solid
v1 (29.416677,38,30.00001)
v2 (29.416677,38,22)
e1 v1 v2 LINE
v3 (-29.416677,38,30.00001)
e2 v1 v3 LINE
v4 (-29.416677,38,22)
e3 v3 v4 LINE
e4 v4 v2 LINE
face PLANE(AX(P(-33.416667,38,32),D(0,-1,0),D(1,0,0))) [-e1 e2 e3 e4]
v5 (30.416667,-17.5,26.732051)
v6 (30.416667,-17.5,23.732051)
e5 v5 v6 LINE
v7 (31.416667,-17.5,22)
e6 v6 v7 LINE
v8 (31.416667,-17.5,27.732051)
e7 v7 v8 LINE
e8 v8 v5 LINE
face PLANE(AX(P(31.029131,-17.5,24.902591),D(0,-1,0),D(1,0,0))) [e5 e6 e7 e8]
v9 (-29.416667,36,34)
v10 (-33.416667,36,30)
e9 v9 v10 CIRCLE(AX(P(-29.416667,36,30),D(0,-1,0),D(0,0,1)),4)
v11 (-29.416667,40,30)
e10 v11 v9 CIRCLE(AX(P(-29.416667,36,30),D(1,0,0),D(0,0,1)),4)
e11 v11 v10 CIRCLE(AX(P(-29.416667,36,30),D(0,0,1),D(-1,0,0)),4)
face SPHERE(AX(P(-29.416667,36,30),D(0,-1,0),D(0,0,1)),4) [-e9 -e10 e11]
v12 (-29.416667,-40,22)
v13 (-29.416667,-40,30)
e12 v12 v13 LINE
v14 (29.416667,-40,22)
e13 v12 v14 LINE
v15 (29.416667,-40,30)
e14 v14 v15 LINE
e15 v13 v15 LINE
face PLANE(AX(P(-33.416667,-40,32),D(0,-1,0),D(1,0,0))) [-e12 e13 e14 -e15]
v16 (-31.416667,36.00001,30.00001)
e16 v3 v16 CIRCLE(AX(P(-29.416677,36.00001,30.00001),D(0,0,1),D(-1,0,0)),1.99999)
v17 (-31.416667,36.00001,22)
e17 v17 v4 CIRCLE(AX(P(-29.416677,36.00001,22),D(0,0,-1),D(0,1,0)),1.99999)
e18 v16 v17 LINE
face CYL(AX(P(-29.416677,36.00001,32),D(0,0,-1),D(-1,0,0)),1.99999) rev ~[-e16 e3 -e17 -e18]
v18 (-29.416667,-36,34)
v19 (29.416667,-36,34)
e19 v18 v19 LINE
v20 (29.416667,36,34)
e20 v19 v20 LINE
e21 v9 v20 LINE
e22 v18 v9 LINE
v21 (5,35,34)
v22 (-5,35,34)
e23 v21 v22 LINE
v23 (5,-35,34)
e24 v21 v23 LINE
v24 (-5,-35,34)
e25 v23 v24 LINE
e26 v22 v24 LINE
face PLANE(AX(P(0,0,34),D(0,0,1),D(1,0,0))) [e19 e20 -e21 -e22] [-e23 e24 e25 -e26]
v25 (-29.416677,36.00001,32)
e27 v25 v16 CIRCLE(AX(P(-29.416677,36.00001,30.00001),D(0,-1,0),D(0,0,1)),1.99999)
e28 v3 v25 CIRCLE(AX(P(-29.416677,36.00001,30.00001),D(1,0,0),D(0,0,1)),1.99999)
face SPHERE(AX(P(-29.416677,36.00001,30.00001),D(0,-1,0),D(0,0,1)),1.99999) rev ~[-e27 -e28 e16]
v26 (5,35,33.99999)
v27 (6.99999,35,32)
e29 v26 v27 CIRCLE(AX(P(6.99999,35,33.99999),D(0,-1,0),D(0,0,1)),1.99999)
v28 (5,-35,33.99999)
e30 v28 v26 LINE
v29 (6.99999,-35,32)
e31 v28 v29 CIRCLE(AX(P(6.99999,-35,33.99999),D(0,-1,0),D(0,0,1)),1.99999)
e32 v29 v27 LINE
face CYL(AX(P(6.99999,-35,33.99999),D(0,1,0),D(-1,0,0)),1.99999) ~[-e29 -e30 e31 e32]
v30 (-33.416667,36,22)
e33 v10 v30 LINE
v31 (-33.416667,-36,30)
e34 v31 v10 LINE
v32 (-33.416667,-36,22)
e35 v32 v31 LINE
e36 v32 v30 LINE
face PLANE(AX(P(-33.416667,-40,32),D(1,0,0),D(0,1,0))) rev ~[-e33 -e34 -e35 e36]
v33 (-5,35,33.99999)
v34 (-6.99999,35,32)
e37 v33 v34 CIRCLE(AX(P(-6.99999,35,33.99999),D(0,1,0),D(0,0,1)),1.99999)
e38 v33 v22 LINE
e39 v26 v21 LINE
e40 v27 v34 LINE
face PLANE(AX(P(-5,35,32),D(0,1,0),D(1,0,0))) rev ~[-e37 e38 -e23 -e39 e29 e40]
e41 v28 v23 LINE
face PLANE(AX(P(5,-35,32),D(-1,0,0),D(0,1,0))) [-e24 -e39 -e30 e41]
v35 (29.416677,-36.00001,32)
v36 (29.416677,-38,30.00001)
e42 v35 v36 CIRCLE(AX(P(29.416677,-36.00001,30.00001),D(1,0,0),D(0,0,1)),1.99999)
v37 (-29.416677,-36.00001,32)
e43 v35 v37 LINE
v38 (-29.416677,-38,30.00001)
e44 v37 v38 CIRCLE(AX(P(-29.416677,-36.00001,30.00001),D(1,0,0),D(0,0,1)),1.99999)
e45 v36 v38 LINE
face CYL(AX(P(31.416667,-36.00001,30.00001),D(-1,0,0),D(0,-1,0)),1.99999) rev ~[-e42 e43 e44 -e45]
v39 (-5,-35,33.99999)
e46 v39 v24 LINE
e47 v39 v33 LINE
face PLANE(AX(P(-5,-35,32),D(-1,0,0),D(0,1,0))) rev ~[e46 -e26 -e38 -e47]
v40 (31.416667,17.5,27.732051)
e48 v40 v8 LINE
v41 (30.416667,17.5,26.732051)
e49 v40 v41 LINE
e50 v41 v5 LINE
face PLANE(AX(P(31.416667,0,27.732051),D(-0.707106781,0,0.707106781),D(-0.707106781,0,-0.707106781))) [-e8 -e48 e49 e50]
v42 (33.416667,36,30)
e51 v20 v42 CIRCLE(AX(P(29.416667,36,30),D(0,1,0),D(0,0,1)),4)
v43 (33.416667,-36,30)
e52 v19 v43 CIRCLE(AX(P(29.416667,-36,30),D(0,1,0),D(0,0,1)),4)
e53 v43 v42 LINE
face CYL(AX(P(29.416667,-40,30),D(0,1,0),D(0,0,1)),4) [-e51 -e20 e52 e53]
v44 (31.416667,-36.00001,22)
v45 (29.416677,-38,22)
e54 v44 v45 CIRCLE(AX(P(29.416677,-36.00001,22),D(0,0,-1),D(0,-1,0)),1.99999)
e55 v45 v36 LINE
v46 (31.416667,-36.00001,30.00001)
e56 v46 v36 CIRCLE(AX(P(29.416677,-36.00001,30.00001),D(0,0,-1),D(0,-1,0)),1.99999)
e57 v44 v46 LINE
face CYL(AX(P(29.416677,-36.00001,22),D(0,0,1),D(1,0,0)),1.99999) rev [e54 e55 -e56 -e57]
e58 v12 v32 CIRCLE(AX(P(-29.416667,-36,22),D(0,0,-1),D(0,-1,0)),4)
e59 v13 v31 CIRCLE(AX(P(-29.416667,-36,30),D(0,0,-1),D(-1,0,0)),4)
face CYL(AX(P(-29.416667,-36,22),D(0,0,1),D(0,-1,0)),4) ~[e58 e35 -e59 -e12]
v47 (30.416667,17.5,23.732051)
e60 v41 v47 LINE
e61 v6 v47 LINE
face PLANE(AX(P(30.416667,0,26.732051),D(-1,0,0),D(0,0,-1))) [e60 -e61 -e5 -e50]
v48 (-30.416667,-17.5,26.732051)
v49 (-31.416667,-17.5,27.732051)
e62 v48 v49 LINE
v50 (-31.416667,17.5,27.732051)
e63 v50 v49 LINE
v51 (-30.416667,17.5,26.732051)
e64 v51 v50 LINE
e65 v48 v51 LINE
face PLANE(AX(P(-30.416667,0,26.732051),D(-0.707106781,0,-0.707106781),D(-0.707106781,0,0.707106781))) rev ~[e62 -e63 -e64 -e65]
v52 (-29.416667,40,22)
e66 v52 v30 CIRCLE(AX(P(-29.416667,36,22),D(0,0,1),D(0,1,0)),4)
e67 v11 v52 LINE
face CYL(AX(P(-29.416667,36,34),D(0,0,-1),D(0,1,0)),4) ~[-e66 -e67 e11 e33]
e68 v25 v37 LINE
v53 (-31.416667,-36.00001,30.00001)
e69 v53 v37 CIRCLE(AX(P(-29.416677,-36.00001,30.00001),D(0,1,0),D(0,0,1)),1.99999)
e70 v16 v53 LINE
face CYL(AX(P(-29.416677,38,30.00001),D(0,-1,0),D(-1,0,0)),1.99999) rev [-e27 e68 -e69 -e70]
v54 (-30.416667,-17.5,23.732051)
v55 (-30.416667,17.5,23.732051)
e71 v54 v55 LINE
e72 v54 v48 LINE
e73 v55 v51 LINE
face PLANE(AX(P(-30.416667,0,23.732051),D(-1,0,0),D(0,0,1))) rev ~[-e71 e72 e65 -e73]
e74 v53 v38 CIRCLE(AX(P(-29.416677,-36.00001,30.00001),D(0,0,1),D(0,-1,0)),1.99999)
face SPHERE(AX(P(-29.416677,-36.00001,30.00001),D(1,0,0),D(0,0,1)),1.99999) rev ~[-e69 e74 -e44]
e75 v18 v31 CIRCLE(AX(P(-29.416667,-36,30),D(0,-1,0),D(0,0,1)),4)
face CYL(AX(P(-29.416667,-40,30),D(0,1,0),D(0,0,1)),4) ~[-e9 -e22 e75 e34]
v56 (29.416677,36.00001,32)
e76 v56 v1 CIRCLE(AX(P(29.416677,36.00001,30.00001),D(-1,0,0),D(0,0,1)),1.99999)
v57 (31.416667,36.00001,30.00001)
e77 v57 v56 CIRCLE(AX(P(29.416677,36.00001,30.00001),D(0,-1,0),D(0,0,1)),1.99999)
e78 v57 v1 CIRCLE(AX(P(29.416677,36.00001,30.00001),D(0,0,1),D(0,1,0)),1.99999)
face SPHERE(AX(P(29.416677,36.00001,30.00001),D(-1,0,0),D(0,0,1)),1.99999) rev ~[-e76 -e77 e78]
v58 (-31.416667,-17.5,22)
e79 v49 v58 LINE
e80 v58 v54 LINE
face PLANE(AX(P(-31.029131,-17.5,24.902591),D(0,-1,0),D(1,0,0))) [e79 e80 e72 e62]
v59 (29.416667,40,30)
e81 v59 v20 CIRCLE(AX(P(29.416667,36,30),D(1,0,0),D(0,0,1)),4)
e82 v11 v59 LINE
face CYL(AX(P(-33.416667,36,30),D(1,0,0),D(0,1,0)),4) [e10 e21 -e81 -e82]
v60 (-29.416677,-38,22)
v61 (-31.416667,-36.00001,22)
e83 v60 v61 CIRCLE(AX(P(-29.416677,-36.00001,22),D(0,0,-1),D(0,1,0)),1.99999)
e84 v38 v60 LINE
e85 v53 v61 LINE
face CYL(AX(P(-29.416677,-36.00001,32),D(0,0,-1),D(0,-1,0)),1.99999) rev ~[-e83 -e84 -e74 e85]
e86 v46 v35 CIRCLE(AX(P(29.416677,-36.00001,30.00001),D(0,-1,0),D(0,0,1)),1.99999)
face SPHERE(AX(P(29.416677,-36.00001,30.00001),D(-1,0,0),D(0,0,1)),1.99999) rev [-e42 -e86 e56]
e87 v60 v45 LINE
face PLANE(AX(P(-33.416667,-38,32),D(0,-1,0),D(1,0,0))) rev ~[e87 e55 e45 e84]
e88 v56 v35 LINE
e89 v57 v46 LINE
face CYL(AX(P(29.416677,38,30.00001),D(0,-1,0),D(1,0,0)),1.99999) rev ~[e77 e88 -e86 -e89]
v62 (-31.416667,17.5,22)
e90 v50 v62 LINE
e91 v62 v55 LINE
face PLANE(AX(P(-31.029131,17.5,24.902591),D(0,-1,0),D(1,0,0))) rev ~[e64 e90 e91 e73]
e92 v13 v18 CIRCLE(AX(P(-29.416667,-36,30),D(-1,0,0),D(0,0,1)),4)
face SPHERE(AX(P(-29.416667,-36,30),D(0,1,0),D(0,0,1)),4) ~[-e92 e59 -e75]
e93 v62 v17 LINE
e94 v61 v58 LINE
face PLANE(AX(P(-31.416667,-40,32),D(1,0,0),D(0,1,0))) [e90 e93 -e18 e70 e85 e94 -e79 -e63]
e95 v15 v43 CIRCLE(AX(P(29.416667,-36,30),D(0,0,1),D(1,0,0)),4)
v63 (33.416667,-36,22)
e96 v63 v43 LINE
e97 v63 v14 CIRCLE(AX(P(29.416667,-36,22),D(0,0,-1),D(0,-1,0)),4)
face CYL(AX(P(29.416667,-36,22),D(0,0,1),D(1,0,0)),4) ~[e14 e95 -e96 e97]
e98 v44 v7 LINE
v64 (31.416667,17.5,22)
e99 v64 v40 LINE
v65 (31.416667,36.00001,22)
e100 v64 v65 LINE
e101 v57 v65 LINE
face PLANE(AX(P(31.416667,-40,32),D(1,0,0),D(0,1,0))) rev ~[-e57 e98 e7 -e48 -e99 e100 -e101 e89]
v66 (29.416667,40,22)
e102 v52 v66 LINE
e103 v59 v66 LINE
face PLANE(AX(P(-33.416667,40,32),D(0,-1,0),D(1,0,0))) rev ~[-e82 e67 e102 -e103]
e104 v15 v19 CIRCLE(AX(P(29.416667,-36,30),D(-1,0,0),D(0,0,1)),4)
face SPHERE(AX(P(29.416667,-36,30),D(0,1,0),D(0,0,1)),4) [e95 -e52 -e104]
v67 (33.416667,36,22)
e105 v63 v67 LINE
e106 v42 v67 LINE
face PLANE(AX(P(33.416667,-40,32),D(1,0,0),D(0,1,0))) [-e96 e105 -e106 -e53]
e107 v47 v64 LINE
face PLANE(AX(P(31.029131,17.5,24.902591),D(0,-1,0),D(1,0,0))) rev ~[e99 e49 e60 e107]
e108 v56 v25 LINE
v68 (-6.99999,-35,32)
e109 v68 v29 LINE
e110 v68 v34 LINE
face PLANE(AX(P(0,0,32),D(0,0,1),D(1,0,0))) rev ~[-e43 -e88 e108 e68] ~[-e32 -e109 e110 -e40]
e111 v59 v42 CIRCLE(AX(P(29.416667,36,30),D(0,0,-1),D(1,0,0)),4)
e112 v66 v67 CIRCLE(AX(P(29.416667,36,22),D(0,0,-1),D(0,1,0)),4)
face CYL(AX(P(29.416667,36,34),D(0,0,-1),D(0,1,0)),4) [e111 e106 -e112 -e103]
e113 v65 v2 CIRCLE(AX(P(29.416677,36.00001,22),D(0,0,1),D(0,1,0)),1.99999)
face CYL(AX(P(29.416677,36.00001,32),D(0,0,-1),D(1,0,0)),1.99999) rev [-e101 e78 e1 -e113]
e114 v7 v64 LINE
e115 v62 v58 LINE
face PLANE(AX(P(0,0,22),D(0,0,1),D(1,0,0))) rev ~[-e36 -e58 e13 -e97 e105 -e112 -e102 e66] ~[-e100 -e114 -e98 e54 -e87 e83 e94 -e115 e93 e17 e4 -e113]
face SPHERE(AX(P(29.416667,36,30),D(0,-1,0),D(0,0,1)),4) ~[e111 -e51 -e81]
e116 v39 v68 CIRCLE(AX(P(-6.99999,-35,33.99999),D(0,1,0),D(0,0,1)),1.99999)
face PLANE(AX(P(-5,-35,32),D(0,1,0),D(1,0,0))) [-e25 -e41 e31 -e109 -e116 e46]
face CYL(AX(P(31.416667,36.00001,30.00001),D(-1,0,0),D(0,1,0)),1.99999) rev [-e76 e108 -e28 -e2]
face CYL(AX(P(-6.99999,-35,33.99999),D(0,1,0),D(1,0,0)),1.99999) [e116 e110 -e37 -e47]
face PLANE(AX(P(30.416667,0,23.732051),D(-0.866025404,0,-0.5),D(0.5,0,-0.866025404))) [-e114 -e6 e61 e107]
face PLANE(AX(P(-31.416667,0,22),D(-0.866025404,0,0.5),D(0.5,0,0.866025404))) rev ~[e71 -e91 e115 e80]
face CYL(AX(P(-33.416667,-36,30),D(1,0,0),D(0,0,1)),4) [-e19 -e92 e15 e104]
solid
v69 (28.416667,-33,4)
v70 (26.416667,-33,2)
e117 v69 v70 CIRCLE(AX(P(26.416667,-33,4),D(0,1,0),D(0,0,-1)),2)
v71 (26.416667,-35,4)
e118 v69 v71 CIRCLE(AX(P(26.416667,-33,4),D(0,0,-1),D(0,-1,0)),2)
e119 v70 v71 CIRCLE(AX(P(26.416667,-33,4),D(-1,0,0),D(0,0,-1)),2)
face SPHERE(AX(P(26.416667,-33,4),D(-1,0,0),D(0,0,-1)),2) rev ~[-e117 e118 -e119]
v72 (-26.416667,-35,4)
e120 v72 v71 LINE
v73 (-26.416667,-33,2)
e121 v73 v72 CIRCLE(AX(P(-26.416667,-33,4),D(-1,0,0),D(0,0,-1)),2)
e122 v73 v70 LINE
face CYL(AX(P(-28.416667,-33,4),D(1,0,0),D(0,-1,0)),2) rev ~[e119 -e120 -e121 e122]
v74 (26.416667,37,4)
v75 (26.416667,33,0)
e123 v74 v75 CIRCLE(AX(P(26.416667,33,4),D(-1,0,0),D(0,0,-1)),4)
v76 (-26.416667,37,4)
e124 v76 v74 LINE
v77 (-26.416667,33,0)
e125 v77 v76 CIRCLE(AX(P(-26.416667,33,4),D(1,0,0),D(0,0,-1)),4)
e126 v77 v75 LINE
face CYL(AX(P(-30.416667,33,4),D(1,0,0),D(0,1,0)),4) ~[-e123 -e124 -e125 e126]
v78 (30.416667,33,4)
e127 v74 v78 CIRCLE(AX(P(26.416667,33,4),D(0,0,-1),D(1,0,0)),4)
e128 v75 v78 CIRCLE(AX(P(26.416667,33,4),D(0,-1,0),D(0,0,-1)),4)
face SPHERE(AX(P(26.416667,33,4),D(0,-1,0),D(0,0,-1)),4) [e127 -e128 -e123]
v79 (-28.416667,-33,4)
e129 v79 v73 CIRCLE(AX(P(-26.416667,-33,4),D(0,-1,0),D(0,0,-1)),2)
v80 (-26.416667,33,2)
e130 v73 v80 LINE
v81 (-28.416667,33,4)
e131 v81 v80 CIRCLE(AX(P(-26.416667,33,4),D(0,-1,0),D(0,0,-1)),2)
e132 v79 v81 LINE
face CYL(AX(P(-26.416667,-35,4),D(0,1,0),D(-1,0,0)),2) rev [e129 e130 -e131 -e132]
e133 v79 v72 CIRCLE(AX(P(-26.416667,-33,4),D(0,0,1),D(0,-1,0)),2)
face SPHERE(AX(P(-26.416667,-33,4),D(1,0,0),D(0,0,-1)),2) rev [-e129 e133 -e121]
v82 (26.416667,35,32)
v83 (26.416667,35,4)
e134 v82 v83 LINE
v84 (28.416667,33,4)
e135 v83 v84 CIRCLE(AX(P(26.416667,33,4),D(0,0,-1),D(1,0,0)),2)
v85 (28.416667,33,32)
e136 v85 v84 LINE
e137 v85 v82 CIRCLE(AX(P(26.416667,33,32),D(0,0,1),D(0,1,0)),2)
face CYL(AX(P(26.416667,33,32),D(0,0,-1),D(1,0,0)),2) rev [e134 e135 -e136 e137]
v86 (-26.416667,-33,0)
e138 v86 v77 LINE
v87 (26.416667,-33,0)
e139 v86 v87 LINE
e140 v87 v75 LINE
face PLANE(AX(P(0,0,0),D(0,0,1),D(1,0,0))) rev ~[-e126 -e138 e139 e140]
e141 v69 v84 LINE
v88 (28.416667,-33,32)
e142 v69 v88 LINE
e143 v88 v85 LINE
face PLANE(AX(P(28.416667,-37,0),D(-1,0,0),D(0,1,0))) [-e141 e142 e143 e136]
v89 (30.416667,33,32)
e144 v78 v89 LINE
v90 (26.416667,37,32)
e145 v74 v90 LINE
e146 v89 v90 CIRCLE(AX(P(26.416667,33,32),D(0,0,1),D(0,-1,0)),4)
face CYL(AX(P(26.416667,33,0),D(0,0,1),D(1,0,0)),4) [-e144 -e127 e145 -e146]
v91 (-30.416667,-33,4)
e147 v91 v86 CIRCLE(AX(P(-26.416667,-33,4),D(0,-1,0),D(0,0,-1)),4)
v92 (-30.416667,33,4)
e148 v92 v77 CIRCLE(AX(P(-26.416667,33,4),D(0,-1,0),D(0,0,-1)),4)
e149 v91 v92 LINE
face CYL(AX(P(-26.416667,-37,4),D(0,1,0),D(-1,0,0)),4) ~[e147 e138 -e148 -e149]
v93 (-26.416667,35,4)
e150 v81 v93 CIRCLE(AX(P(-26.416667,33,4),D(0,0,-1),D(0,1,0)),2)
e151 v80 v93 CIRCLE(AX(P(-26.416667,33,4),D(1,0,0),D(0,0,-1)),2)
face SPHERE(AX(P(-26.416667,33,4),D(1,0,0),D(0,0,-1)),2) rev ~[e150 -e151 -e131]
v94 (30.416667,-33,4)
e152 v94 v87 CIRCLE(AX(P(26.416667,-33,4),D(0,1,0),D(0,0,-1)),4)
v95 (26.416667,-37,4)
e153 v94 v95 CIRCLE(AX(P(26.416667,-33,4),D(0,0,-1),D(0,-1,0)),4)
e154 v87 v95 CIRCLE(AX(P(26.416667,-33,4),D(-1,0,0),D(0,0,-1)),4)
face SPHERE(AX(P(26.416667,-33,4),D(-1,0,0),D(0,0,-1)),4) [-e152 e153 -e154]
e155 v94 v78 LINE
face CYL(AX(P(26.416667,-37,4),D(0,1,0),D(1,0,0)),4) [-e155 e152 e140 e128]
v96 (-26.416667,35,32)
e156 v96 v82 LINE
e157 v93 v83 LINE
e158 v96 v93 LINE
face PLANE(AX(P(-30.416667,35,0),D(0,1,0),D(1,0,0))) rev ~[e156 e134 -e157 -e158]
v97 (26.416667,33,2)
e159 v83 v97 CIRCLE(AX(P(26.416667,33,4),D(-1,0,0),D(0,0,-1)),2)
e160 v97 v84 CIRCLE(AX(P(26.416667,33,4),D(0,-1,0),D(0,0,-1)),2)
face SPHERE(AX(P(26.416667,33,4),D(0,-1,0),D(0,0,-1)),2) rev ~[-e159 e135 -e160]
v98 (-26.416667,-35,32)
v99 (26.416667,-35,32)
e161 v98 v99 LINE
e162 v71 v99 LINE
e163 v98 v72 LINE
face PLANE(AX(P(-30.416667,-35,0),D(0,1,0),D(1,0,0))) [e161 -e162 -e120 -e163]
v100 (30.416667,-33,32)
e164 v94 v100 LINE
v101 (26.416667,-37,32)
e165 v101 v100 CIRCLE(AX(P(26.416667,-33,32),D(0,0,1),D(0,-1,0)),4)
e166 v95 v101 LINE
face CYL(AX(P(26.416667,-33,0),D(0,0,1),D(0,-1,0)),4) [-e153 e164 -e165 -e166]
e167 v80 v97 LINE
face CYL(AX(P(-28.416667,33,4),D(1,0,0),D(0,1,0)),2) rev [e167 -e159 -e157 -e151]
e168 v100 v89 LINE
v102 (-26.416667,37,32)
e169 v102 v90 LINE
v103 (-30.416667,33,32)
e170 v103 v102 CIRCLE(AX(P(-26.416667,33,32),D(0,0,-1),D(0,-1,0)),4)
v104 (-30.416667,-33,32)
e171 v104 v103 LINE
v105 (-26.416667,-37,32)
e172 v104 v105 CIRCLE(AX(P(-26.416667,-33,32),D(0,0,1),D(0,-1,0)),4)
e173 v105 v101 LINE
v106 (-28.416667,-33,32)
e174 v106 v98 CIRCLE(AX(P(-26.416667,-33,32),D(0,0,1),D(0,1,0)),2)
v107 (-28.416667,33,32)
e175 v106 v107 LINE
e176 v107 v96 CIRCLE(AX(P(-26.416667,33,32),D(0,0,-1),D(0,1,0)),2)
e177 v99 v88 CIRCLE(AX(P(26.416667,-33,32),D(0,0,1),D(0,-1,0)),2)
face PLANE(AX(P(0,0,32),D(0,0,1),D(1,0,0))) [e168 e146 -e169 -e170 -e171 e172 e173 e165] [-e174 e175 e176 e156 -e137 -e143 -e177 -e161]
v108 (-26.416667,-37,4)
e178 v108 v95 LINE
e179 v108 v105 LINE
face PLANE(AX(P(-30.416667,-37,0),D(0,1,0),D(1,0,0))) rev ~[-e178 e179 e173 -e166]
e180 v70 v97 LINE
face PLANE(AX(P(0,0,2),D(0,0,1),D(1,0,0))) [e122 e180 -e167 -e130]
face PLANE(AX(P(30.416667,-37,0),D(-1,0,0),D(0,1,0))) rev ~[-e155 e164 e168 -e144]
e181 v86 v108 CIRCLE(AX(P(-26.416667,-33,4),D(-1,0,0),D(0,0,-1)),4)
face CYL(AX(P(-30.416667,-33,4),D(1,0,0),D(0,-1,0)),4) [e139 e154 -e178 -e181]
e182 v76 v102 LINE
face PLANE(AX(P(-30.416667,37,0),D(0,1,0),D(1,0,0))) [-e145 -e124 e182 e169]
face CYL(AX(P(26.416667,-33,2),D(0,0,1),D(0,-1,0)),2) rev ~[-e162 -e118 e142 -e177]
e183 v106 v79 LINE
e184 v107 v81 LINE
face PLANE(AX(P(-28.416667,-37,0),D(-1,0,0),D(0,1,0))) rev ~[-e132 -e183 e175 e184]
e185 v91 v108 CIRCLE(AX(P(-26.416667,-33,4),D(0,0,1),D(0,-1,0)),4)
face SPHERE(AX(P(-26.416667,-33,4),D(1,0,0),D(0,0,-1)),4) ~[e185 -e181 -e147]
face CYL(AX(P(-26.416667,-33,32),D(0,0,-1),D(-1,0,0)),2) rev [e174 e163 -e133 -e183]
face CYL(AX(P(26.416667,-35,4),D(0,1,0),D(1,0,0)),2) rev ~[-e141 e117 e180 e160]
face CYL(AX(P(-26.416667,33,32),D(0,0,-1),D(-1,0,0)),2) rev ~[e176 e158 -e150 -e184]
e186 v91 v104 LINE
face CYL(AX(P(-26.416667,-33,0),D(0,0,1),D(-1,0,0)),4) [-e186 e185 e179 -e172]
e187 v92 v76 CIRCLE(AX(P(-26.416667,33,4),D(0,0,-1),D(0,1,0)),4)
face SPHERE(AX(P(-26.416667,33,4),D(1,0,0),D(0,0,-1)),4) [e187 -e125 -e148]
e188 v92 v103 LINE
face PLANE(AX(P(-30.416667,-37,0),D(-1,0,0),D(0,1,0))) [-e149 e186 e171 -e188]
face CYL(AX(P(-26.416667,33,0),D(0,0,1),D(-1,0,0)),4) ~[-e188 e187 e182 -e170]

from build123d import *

# Parameters (mm, degrees)
F3_W          = 60.8333333333
F3_H          = 74
F4_DEPTH      = 32
F5_T          = -2
F6_R          = 2
F7_R          = 4
F8_W          = 66.8333333333
F8_H          = 80
F9_DEPTH      = 2
F9_DEPTH_BACK = 10
F10_T         = -2
F11_W         = 10
F11_H         = 70
F12_DEPTH     = 2.001
F14_DEPTH     = 17.5
F15_R         = 1.99999
F16_R         = 4


# Not quite as in the source:
# - a fillet or chamfer is up to 0.001 mm smaller than in the source, because OpenCascade refuses the exact size


with BuildPart() as f4:
    # F3 (on Top) → F4 (new body, through all)
    with BuildSketch(Plane.XY):
        Rectangle(F3_W, F3_H)
    extrude(amount=F4_DEPTH)

    # F5
    f5_openings = [f4.faces().sort_by_distance(p)[0] for p in [
        (0, 0, 32),
    ]]
    offset(amount=F5_T, openings=f5_openings)

    # F6
    f6_edges = [f4.edges().sort_by_distance(p)[0] for p in [
        (0, -35, 2),
        (28.416667, 0, 2),
        (0, 35, 2),
        (-28.416667, 0, 2),
        (28.416667, -35, 17),
        (28.416667, 35, 17),
        (-28.416667, 35, 17),
        (-28.416667, -35, 17),
    ]]
    fillet(f6_edges, radius=F6_R)

    # F7
    f7_edges = [f4.edges().sort_by_distance(p)[0] for p in [
        (0, -37, 0),
        (30.416667, 0, 0),
        (0, 37, 0),
        (-30.416667, 0, 0),
        (30.416667, -37, 16),
        (30.416667, 37, 16),
        (-30.416667, -37, 16),
        (-30.416667, 37, 16),
    ]]
    fillet(f7_edges, radius=F7_R)


with BuildPart() as f9:
    # F8 (on offset) → F9 (new body, two sides)
    with BuildSketch(Plane.XY.offset(32)) as f9_sk:
        Rectangle(F8_W, F8_H)
    extrude(amount=F9_DEPTH)
    extrude(f9_sk.sketch, amount=-F9_DEPTH_BACK)

    # F10
    f10_openings = [f9.faces().sort_by_distance(p)[0] for p in [
        (0, 0, 22),
    ]]
    offset(amount=F10_T, openings=f10_openings)

    # F11 (on offset) → F12 (cut, through all)
    with BuildSketch(Plane.XY.offset(32)):
        Rectangle(F11_W, F11_H)
    extrude(amount=F12_DEPTH, mode=Mode.SUBTRACT)

    # F13 (on Front) → F14 (join, symmetric)
    with BuildSketch(Plane.XZ):
        Polygon((-30.4166666667, 26.7320508076), (-31.4166666667, 27.7320508076), (-31.4166666667, 22), (-30.4166666667, 23.7320508076), align=None)
        Polygon((31.4166666667, 22), (31.4166666667, 27.7320508076), (30.4166666667, 26.7320508076), (30.4166666667, 23.7320508076), align=None)
    extrude(amount=F14_DEPTH, both=True)

    # F15 (radius 2 in the source; OpenCascade refuses exactly that, so slightly less here)
    f15_edges = [f9.edges().sort_by_distance(p)[0] for p in [
        (0, -38, 32),
        (-31.416667, 0, 32),
        (0, 38, 32),
        (31.416667, 0, 32),
        (5, 0, 32),
        (-5, 0, 32),
        (-31.416667, -38, 27),
        (31.416667, -38, 27),
        (31.416667, 38, 27),
        (-31.416667, 38, 27),
    ]]
    fillet(f15_edges, radius=F15_R)

    # F16
    f16_edges = [f9.edges().sort_by_distance(p)[0] for p in [
        (33.416667, 0, 34),
        (-33.416667, 0, 34),
        (0, 40, 34),
        (0, -40, 34),
        (33.416667, -40, 28),
        (33.416667, 40, 28),
        (-33.416667, 40, 28),
        (-33.416667, -40, 28),
    ]]
    fillet(f16_edges, radius=F16_R)


solid = Compound([f4.part, f9.part])
